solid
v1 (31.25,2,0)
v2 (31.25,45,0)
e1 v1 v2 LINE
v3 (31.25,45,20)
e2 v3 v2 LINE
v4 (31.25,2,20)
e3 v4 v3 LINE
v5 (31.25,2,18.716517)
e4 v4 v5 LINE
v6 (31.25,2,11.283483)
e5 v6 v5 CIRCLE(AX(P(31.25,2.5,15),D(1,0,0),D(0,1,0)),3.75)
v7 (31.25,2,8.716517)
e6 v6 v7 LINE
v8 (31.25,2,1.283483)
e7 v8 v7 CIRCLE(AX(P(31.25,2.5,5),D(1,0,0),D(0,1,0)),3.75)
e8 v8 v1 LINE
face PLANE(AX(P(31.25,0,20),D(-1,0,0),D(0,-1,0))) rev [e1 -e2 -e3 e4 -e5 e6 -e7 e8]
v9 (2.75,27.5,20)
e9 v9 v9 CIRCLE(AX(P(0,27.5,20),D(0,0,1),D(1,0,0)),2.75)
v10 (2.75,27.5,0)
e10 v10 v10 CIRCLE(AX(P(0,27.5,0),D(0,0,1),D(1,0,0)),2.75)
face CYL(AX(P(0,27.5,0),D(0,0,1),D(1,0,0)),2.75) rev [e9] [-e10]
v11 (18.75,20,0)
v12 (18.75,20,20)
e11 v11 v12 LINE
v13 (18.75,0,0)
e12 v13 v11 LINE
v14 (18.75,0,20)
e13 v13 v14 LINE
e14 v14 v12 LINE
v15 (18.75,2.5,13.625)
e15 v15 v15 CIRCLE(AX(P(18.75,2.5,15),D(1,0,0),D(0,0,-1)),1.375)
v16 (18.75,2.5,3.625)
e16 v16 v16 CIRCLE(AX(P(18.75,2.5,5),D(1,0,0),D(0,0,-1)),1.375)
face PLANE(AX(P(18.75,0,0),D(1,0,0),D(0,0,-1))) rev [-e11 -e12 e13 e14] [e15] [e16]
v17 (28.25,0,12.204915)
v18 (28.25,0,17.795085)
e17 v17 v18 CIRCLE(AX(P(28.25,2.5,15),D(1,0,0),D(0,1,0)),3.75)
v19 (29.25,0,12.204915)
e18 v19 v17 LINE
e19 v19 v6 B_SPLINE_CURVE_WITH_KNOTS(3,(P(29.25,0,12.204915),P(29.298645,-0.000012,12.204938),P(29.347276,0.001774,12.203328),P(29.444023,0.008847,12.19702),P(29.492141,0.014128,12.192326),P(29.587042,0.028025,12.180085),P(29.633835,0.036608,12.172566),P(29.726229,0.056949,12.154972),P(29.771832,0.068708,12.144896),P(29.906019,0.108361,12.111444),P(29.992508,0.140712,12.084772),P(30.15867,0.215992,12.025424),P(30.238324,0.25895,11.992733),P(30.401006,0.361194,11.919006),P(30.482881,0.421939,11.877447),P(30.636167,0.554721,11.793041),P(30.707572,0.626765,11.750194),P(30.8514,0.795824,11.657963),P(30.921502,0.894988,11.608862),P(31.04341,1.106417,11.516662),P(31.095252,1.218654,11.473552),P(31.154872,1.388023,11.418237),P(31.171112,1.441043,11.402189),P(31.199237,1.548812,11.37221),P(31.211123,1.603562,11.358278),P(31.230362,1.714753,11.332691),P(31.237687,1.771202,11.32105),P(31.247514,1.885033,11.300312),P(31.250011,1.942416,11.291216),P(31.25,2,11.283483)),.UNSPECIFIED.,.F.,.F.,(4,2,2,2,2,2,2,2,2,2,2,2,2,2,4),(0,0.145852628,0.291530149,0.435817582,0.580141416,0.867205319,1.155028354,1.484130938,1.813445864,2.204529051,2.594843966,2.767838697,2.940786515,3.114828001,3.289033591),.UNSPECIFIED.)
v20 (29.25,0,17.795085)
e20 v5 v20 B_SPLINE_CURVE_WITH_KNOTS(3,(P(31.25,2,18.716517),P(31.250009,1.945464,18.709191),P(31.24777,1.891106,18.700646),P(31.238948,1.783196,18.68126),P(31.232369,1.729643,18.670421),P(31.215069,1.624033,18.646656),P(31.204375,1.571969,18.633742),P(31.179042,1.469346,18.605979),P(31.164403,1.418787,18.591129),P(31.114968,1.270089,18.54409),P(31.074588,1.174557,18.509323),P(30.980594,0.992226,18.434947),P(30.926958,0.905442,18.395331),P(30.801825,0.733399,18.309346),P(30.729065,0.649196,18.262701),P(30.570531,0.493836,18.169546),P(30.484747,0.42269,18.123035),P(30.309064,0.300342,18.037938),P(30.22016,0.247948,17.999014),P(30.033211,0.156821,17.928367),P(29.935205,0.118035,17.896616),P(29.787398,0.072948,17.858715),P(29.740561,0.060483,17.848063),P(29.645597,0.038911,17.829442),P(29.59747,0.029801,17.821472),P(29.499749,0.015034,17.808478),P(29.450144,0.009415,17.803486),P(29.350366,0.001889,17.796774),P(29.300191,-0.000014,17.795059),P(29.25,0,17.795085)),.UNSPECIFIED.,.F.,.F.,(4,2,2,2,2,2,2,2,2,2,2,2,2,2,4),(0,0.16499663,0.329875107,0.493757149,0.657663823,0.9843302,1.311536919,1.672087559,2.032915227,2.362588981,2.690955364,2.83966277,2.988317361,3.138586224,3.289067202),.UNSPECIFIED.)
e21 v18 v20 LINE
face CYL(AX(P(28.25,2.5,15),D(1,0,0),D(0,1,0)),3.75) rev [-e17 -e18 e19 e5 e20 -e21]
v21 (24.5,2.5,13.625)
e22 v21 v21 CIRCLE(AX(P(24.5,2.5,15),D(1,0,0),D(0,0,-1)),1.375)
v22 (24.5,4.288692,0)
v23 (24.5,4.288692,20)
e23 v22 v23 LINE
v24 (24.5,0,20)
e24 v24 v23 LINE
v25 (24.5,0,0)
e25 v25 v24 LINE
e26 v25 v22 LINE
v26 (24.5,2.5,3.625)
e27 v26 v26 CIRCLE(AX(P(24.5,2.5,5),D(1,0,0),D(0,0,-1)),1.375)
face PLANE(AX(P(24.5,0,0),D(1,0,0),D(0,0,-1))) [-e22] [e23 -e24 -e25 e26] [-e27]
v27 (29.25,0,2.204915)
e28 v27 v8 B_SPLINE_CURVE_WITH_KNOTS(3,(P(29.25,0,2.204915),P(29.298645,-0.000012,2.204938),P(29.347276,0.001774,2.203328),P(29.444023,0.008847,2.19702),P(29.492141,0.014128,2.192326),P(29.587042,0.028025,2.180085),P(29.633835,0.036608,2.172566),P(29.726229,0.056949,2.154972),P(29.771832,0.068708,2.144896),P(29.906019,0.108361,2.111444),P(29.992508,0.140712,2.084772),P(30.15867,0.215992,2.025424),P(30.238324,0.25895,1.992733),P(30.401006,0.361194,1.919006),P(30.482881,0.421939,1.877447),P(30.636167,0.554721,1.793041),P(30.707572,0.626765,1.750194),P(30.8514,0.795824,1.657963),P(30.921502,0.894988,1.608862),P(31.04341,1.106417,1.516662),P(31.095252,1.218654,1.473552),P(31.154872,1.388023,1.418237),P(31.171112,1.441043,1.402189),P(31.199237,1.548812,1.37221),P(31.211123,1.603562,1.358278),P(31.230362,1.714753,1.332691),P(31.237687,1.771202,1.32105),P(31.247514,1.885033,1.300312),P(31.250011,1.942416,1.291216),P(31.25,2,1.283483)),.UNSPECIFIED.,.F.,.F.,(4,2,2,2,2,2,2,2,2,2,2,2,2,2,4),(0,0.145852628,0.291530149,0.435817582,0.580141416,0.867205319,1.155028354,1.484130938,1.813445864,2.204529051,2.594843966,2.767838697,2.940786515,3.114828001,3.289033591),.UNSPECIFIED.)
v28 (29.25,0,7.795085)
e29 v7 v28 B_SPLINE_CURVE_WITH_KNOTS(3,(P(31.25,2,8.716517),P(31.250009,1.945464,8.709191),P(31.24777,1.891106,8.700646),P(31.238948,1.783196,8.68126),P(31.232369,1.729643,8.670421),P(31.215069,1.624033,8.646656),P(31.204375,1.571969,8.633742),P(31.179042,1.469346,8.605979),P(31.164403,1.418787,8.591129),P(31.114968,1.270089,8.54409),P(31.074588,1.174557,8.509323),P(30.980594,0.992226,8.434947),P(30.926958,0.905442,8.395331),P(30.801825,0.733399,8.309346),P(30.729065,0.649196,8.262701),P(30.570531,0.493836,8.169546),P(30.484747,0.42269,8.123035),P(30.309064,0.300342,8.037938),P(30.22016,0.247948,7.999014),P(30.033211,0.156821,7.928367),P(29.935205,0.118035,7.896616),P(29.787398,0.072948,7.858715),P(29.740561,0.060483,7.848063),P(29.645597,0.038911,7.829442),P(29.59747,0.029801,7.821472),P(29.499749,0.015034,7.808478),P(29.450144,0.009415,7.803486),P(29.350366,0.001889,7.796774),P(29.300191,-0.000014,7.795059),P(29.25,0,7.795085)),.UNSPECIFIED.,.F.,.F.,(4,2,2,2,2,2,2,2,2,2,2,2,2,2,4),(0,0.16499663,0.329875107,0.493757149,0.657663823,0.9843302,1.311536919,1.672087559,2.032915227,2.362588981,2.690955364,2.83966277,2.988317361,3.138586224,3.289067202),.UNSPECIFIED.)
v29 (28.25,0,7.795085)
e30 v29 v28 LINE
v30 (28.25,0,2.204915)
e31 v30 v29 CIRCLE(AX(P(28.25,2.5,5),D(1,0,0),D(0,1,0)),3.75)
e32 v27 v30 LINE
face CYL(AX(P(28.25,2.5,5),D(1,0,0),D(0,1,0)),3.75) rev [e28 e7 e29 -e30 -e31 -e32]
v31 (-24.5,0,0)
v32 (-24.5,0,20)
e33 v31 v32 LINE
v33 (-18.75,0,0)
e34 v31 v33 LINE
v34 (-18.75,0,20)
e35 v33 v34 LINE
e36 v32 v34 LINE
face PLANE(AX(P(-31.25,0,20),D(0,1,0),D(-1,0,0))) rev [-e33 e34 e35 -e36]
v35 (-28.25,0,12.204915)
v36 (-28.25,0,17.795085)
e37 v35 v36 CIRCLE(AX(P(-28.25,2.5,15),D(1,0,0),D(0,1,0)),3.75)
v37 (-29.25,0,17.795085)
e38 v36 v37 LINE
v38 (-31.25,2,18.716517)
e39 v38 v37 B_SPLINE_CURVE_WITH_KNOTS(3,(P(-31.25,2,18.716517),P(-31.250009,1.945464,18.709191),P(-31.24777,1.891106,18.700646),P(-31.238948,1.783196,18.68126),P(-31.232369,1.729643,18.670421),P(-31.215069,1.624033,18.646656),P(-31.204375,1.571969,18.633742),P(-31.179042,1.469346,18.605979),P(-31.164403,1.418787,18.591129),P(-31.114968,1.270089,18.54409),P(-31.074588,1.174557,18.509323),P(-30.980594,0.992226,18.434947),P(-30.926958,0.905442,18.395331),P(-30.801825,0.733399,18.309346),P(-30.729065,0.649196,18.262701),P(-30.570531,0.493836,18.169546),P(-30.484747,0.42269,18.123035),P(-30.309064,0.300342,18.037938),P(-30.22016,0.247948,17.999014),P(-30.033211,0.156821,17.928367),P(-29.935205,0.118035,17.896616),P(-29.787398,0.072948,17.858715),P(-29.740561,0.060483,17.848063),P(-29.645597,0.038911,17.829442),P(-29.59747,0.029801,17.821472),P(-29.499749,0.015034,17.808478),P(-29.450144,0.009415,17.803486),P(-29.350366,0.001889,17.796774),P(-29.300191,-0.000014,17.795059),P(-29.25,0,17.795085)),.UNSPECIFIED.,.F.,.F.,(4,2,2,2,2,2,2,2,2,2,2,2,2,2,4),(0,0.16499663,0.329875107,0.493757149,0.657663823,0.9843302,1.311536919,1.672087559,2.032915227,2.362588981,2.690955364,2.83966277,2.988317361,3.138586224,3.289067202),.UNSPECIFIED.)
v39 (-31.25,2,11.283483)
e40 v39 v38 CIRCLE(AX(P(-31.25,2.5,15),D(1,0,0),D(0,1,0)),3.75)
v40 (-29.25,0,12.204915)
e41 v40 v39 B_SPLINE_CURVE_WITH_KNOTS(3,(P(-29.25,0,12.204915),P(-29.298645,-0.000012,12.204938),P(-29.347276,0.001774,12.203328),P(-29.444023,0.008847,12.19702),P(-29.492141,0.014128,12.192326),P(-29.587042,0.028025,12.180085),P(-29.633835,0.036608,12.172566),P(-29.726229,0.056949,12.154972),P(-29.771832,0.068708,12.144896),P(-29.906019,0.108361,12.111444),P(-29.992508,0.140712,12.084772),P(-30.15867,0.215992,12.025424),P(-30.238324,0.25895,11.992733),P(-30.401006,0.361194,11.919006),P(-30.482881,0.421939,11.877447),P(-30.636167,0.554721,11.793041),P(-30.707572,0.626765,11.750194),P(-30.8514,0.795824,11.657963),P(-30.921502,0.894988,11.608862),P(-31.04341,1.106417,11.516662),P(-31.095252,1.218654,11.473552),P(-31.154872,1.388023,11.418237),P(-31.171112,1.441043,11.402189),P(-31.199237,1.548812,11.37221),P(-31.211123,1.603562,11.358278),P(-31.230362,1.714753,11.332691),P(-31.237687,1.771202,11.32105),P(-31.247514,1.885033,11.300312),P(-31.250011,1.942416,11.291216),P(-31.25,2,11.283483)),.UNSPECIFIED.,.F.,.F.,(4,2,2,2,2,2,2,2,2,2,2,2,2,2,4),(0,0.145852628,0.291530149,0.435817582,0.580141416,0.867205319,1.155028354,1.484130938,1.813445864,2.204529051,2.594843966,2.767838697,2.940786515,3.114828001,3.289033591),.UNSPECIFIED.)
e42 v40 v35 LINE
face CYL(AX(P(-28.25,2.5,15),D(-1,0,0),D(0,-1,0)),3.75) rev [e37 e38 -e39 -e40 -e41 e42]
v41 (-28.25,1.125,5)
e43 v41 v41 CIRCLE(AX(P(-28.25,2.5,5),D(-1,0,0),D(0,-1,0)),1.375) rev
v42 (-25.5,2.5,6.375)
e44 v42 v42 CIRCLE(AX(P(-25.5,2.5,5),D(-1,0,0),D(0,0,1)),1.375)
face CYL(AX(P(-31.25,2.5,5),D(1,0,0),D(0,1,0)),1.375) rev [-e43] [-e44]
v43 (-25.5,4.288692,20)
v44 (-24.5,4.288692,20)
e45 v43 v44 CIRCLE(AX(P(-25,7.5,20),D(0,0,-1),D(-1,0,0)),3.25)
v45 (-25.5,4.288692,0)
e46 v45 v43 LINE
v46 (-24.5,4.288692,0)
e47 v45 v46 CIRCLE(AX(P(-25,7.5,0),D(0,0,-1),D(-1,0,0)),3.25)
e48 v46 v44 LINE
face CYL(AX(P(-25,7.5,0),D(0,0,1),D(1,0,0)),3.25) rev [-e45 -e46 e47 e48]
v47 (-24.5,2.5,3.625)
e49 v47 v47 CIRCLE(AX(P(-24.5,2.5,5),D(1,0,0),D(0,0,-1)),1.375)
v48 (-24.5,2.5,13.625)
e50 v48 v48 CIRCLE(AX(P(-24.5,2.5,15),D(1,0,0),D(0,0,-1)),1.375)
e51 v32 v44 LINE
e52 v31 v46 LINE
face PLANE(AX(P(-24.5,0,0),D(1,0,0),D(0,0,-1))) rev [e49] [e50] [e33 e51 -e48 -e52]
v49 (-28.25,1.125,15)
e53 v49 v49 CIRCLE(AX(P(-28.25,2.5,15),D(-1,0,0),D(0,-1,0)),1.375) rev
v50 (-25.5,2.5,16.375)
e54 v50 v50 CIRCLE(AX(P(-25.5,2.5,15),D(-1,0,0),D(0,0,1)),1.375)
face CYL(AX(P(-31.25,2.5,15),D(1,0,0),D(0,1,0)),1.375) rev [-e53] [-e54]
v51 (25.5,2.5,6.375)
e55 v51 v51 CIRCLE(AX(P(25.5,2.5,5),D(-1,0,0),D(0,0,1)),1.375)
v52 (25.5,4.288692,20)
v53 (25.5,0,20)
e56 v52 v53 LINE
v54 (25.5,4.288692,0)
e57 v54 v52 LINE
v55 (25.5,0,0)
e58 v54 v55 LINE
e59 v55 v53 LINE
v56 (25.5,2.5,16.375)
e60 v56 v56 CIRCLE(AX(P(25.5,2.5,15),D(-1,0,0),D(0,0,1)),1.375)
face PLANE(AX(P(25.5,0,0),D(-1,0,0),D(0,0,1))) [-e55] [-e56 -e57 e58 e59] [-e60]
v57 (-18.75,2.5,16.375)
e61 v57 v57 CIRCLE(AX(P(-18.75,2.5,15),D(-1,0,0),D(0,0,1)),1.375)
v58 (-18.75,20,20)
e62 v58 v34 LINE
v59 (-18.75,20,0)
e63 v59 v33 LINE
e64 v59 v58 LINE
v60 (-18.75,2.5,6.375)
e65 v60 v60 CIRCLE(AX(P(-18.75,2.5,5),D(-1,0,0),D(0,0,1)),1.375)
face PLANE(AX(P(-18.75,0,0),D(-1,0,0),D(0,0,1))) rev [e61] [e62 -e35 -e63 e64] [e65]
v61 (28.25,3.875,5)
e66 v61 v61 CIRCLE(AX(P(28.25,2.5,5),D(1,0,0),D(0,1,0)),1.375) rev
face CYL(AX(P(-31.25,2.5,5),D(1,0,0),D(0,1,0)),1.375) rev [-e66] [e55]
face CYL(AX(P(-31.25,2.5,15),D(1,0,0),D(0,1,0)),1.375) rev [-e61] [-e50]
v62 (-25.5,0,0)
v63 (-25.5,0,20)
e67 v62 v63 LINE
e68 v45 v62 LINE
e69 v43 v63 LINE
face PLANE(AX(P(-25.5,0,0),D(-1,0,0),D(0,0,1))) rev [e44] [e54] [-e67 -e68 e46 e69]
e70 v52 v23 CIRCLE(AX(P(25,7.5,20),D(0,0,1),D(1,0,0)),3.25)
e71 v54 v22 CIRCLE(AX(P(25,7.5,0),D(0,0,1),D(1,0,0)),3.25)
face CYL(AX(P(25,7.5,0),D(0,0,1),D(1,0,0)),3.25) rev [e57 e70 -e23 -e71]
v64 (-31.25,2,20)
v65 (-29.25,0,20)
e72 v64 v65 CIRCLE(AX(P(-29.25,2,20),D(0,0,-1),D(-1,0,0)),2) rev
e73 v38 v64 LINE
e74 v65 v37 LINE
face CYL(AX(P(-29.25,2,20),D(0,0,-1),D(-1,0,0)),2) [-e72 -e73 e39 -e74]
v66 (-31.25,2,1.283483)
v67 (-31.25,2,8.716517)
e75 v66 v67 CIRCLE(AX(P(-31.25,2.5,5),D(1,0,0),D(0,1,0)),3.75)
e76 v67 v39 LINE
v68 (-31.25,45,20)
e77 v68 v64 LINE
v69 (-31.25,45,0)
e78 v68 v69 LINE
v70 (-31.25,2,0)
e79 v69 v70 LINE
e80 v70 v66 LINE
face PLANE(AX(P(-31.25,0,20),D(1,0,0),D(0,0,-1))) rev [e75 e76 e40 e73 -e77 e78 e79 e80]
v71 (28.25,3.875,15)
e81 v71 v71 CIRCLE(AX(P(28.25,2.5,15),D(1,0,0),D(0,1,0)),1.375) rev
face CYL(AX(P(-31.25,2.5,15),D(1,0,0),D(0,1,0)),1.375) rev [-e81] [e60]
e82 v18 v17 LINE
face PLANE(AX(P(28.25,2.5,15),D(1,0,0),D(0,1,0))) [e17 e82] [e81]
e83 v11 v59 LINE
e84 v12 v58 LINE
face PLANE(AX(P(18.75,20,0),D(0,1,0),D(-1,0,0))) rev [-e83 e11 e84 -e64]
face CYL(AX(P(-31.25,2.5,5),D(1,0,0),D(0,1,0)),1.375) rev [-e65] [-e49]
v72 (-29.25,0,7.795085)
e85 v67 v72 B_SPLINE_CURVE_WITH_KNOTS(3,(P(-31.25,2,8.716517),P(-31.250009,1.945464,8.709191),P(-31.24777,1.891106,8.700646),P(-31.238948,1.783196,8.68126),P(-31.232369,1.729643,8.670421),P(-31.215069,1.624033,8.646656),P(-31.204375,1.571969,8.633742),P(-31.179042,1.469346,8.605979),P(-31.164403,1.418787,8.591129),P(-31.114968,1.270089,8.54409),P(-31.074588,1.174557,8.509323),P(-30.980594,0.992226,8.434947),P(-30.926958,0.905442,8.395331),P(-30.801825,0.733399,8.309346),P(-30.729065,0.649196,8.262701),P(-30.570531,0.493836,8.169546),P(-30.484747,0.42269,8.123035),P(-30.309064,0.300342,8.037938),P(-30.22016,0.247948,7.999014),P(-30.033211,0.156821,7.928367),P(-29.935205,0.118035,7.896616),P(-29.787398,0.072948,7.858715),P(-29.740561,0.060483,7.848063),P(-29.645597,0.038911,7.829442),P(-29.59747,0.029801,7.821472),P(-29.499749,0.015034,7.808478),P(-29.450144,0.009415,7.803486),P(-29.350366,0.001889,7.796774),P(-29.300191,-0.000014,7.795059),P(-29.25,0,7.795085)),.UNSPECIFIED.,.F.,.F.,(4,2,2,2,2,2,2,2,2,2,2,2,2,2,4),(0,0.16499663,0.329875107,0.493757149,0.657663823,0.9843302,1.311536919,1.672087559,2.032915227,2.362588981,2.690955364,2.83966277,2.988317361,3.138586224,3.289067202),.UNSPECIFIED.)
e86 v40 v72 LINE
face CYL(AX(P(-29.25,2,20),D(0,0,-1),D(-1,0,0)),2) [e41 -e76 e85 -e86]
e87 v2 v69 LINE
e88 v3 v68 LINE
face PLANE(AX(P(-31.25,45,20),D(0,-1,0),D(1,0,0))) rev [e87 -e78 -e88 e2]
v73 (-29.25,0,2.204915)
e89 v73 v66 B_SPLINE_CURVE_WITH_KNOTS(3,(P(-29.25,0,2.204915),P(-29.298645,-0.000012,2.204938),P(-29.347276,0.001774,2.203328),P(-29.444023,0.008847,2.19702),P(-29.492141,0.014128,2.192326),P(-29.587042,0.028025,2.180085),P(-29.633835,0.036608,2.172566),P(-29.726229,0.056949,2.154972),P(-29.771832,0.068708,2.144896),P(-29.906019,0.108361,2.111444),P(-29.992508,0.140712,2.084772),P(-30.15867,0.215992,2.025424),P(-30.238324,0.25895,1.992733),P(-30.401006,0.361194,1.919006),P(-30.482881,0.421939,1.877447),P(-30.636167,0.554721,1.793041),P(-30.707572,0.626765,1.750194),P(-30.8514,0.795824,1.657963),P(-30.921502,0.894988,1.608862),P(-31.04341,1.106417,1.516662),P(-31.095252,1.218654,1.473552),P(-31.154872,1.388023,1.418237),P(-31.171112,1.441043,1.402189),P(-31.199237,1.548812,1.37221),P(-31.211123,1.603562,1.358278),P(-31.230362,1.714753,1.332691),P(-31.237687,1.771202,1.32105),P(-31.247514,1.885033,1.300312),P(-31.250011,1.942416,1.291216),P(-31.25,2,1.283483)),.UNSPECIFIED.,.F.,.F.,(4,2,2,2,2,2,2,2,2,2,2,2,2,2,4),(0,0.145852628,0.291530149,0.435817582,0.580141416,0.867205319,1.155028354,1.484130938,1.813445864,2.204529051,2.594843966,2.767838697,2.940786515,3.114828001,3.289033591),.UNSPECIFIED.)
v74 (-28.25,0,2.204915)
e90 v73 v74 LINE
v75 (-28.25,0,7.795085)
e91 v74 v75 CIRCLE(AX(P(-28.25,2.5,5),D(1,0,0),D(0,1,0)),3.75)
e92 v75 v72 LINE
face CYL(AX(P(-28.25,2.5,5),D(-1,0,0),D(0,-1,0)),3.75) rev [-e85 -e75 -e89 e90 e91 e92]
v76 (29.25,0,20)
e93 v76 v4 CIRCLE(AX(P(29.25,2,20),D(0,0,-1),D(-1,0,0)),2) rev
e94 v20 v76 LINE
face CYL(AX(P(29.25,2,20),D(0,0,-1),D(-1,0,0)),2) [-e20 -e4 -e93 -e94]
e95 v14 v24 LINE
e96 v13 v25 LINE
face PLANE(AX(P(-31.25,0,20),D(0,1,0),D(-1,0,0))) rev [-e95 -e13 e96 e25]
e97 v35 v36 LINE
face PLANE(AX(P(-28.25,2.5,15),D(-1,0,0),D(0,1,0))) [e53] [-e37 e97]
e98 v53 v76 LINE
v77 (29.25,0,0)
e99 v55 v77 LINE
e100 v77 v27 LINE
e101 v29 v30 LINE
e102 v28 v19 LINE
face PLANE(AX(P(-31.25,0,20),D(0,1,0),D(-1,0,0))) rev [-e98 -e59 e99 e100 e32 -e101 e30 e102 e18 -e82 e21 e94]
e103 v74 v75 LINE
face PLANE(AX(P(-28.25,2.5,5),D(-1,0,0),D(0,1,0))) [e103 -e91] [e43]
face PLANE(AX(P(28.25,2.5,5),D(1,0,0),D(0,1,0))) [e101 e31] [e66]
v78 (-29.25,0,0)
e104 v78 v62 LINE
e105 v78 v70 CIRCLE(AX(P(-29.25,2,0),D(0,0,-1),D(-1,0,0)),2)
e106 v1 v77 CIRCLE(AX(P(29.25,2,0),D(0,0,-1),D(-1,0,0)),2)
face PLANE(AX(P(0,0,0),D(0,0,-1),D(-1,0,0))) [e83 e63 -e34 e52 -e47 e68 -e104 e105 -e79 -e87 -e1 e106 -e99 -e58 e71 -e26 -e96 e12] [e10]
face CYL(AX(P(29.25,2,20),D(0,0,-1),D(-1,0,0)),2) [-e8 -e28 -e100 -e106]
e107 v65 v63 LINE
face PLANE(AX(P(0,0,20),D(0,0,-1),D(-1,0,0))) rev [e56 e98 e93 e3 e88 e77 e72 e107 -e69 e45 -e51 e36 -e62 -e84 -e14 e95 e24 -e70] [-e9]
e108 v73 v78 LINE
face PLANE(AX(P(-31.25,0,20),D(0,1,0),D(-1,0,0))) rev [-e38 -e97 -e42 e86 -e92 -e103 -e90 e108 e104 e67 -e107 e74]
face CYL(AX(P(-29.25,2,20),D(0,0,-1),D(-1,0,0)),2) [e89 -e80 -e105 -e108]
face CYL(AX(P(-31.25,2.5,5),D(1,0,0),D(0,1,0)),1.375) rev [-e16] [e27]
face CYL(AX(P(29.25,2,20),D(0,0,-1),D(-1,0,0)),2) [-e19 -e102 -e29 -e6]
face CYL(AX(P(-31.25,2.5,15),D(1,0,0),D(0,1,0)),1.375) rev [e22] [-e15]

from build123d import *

# Parameters (mm, degrees)
SKETCH1_W           = 62.5
SKETCH1_H           = 45
BOSS_EXTRUDE1_DEPTH = 20
CUT_EXTRUDE10_DEPTH = 59.322915736
SKETCH18_W          = 37.5
SKETCH18_H          = 20
CUT_EXTRUDE13_DEPTH = 59.322915736
SKETCH19_R          = 2.75
CUT_EXTRUDE14_DEPTH = 59.322915736
SKETCH20_R          = 1.375
CUT_EXTRUDE15_DEPTH = 80.569152314
FILLET1_R           = 2
SKETCH21_R          = 3.75
CUT_EXTRUDE16_DEPTH = 3


with BuildPart() as part:
    # Sketch1 → Boss-Extrude1 (new body)
    with BuildSketch(Plane.XY):
        with Locations((0, 22.5)):
            Rectangle(SKETCH1_W, SKETCH1_H)
    extrude(amount=BOSS_EXTRUDE1_DEPTH)

    # Sketch14 → Cut-Extrude10 (cut, through all)
    with BuildSketch(Plane.XY.offset(20)):
        with BuildLine():
            ThreePointArc((24.5, 4.288691855), (24.749252587, 4.259687402), (25, 4.25))
            Line((25, 4.25), (25, 10.75))
            ThreePointArc((25, 10.75), (21.759687402, 7.750747413), (24.5, 4.288691855))
        make_face()
        with BuildLine():
            Line((25, 10.75), (25, 4.25))
            ThreePointArc((25, 4.25), (25.250747413, 4.259687402), (25.5, 4.288691855))
            ThreePointArc((25.5, 4.288691855), (27.468552207, 5.386058184), (28.25, 7.5))
            ThreePointArc((28.25, 7.5), (27.298097039, 9.798097039), (25, 10.75))
        make_face()
        with BuildLine():
            Line((24.5, 0), (25, 0))
            Line((25, 0), (25, 4.25))
            ThreePointArc((25, 4.25), (24.749252587, 4.259687402), (24.5, 4.288691855))
            Line((24.5, 4.288691855), (24.5, 0))
        make_face()
        with BuildLine():
            Line((25, 4.25), (25, 0))
            Line((25, 0), (25.5, 0))
            Line((25.5, 0), (25.5, 4.288691855))
            ThreePointArc((25.5, 4.288691855), (25.250747413, 4.259687402), (25, 4.25))
        make_face()
    cut_extrude10 = extrude(amount=-CUT_EXTRUDE10_DEPTH, mode=Mode.SUBTRACT)

    # Mirror1: Cut-Extrude10 across plane
    add(cut_extrude10.mirror(Plane(origin=(0, 0, 0), x_dir=(0, 0, 1), z_dir=(1, 0, 0))), mode=Mode.SUBTRACT)

    # Sketch18 → Cut-Extrude13 (cut, through all)
    with BuildSketch(Plane.XY.offset(20)):
        with Locations((0, 10)):
            Rectangle(SKETCH18_W, SKETCH18_H)
    extrude(amount=-CUT_EXTRUDE13_DEPTH, mode=Mode.SUBTRACT)

    # Sketch19 → Cut-Extrude14 (cut, through all)
    with BuildSketch(Plane.XY.offset(20)):
        with Locations((0, 27.5)):
            Circle(SKETCH19_R)
    extrude(amount=-CUT_EXTRUDE14_DEPTH, mode=Mode.SUBTRACT)

    # Sketch20 → Cut-Extrude15 (cut, through all)
    with BuildSketch(Plane(origin=(31.25, 0, 0), x_dir=(0, 0, -1), z_dir=(1, 0, 0))):
        with Locations(Location((-5, 2.5, 0), (0, 0, 180))):
            Circle(SKETCH20_R)
        with Locations(Location((-15, 2.5, 0), (0, 0, 180))):
            Circle(SKETCH20_R)
    extrude(amount=-CUT_EXTRUDE15_DEPTH, mode=Mode.SUBTRACT)

    # Fillet1
    # the kernel refuses this fillet: 2 mm, written as the material it takes off along each edge
    with BuildSketch(Plane(origin=(31.25, 0, -5), x_dir=(0, 1, 0), z_dir=(0, 0, 1)), Plane(origin=(-31.25, 0, -5), x_dir=(1, 0, 0), z_dir=(0, 0, 1))) as fillet1_piece_1:
        with BuildLine():
            CenterArc((FILLET1_R, FILLET1_R), FILLET1_R, 180, 90)
            Line((0, FILLET1_R), (0, 0))
            Line((0, 0), (FILLET1_R, 0))
        make_face()
    extrude(amount=30, mode=Mode.SUBTRACT)

    # Sketch21 → Cut-Extrude16 (cut)
    with BuildSketch(Plane(origin=(31.25, 0, 0), x_dir=(0, 0, -1), z_dir=(1, 0, 0))):
        with Locations((-5, 2.5)):
            Circle(SKETCH21_R)
        with Locations((-15, 2.5)):
            Circle(SKETCH21_R)
    cut_extrude16 = extrude(amount=-CUT_EXTRUDE16_DEPTH, mode=Mode.SUBTRACT)

    # Mirror2: Cut-Extrude16 across plane
    add(cut_extrude16.mirror(Plane(origin=(0, 0, 0), x_dir=(0, 0, 1), z_dir=(1, 0, 0))), mode=Mode.SUBTRACT)


solid = part.part
